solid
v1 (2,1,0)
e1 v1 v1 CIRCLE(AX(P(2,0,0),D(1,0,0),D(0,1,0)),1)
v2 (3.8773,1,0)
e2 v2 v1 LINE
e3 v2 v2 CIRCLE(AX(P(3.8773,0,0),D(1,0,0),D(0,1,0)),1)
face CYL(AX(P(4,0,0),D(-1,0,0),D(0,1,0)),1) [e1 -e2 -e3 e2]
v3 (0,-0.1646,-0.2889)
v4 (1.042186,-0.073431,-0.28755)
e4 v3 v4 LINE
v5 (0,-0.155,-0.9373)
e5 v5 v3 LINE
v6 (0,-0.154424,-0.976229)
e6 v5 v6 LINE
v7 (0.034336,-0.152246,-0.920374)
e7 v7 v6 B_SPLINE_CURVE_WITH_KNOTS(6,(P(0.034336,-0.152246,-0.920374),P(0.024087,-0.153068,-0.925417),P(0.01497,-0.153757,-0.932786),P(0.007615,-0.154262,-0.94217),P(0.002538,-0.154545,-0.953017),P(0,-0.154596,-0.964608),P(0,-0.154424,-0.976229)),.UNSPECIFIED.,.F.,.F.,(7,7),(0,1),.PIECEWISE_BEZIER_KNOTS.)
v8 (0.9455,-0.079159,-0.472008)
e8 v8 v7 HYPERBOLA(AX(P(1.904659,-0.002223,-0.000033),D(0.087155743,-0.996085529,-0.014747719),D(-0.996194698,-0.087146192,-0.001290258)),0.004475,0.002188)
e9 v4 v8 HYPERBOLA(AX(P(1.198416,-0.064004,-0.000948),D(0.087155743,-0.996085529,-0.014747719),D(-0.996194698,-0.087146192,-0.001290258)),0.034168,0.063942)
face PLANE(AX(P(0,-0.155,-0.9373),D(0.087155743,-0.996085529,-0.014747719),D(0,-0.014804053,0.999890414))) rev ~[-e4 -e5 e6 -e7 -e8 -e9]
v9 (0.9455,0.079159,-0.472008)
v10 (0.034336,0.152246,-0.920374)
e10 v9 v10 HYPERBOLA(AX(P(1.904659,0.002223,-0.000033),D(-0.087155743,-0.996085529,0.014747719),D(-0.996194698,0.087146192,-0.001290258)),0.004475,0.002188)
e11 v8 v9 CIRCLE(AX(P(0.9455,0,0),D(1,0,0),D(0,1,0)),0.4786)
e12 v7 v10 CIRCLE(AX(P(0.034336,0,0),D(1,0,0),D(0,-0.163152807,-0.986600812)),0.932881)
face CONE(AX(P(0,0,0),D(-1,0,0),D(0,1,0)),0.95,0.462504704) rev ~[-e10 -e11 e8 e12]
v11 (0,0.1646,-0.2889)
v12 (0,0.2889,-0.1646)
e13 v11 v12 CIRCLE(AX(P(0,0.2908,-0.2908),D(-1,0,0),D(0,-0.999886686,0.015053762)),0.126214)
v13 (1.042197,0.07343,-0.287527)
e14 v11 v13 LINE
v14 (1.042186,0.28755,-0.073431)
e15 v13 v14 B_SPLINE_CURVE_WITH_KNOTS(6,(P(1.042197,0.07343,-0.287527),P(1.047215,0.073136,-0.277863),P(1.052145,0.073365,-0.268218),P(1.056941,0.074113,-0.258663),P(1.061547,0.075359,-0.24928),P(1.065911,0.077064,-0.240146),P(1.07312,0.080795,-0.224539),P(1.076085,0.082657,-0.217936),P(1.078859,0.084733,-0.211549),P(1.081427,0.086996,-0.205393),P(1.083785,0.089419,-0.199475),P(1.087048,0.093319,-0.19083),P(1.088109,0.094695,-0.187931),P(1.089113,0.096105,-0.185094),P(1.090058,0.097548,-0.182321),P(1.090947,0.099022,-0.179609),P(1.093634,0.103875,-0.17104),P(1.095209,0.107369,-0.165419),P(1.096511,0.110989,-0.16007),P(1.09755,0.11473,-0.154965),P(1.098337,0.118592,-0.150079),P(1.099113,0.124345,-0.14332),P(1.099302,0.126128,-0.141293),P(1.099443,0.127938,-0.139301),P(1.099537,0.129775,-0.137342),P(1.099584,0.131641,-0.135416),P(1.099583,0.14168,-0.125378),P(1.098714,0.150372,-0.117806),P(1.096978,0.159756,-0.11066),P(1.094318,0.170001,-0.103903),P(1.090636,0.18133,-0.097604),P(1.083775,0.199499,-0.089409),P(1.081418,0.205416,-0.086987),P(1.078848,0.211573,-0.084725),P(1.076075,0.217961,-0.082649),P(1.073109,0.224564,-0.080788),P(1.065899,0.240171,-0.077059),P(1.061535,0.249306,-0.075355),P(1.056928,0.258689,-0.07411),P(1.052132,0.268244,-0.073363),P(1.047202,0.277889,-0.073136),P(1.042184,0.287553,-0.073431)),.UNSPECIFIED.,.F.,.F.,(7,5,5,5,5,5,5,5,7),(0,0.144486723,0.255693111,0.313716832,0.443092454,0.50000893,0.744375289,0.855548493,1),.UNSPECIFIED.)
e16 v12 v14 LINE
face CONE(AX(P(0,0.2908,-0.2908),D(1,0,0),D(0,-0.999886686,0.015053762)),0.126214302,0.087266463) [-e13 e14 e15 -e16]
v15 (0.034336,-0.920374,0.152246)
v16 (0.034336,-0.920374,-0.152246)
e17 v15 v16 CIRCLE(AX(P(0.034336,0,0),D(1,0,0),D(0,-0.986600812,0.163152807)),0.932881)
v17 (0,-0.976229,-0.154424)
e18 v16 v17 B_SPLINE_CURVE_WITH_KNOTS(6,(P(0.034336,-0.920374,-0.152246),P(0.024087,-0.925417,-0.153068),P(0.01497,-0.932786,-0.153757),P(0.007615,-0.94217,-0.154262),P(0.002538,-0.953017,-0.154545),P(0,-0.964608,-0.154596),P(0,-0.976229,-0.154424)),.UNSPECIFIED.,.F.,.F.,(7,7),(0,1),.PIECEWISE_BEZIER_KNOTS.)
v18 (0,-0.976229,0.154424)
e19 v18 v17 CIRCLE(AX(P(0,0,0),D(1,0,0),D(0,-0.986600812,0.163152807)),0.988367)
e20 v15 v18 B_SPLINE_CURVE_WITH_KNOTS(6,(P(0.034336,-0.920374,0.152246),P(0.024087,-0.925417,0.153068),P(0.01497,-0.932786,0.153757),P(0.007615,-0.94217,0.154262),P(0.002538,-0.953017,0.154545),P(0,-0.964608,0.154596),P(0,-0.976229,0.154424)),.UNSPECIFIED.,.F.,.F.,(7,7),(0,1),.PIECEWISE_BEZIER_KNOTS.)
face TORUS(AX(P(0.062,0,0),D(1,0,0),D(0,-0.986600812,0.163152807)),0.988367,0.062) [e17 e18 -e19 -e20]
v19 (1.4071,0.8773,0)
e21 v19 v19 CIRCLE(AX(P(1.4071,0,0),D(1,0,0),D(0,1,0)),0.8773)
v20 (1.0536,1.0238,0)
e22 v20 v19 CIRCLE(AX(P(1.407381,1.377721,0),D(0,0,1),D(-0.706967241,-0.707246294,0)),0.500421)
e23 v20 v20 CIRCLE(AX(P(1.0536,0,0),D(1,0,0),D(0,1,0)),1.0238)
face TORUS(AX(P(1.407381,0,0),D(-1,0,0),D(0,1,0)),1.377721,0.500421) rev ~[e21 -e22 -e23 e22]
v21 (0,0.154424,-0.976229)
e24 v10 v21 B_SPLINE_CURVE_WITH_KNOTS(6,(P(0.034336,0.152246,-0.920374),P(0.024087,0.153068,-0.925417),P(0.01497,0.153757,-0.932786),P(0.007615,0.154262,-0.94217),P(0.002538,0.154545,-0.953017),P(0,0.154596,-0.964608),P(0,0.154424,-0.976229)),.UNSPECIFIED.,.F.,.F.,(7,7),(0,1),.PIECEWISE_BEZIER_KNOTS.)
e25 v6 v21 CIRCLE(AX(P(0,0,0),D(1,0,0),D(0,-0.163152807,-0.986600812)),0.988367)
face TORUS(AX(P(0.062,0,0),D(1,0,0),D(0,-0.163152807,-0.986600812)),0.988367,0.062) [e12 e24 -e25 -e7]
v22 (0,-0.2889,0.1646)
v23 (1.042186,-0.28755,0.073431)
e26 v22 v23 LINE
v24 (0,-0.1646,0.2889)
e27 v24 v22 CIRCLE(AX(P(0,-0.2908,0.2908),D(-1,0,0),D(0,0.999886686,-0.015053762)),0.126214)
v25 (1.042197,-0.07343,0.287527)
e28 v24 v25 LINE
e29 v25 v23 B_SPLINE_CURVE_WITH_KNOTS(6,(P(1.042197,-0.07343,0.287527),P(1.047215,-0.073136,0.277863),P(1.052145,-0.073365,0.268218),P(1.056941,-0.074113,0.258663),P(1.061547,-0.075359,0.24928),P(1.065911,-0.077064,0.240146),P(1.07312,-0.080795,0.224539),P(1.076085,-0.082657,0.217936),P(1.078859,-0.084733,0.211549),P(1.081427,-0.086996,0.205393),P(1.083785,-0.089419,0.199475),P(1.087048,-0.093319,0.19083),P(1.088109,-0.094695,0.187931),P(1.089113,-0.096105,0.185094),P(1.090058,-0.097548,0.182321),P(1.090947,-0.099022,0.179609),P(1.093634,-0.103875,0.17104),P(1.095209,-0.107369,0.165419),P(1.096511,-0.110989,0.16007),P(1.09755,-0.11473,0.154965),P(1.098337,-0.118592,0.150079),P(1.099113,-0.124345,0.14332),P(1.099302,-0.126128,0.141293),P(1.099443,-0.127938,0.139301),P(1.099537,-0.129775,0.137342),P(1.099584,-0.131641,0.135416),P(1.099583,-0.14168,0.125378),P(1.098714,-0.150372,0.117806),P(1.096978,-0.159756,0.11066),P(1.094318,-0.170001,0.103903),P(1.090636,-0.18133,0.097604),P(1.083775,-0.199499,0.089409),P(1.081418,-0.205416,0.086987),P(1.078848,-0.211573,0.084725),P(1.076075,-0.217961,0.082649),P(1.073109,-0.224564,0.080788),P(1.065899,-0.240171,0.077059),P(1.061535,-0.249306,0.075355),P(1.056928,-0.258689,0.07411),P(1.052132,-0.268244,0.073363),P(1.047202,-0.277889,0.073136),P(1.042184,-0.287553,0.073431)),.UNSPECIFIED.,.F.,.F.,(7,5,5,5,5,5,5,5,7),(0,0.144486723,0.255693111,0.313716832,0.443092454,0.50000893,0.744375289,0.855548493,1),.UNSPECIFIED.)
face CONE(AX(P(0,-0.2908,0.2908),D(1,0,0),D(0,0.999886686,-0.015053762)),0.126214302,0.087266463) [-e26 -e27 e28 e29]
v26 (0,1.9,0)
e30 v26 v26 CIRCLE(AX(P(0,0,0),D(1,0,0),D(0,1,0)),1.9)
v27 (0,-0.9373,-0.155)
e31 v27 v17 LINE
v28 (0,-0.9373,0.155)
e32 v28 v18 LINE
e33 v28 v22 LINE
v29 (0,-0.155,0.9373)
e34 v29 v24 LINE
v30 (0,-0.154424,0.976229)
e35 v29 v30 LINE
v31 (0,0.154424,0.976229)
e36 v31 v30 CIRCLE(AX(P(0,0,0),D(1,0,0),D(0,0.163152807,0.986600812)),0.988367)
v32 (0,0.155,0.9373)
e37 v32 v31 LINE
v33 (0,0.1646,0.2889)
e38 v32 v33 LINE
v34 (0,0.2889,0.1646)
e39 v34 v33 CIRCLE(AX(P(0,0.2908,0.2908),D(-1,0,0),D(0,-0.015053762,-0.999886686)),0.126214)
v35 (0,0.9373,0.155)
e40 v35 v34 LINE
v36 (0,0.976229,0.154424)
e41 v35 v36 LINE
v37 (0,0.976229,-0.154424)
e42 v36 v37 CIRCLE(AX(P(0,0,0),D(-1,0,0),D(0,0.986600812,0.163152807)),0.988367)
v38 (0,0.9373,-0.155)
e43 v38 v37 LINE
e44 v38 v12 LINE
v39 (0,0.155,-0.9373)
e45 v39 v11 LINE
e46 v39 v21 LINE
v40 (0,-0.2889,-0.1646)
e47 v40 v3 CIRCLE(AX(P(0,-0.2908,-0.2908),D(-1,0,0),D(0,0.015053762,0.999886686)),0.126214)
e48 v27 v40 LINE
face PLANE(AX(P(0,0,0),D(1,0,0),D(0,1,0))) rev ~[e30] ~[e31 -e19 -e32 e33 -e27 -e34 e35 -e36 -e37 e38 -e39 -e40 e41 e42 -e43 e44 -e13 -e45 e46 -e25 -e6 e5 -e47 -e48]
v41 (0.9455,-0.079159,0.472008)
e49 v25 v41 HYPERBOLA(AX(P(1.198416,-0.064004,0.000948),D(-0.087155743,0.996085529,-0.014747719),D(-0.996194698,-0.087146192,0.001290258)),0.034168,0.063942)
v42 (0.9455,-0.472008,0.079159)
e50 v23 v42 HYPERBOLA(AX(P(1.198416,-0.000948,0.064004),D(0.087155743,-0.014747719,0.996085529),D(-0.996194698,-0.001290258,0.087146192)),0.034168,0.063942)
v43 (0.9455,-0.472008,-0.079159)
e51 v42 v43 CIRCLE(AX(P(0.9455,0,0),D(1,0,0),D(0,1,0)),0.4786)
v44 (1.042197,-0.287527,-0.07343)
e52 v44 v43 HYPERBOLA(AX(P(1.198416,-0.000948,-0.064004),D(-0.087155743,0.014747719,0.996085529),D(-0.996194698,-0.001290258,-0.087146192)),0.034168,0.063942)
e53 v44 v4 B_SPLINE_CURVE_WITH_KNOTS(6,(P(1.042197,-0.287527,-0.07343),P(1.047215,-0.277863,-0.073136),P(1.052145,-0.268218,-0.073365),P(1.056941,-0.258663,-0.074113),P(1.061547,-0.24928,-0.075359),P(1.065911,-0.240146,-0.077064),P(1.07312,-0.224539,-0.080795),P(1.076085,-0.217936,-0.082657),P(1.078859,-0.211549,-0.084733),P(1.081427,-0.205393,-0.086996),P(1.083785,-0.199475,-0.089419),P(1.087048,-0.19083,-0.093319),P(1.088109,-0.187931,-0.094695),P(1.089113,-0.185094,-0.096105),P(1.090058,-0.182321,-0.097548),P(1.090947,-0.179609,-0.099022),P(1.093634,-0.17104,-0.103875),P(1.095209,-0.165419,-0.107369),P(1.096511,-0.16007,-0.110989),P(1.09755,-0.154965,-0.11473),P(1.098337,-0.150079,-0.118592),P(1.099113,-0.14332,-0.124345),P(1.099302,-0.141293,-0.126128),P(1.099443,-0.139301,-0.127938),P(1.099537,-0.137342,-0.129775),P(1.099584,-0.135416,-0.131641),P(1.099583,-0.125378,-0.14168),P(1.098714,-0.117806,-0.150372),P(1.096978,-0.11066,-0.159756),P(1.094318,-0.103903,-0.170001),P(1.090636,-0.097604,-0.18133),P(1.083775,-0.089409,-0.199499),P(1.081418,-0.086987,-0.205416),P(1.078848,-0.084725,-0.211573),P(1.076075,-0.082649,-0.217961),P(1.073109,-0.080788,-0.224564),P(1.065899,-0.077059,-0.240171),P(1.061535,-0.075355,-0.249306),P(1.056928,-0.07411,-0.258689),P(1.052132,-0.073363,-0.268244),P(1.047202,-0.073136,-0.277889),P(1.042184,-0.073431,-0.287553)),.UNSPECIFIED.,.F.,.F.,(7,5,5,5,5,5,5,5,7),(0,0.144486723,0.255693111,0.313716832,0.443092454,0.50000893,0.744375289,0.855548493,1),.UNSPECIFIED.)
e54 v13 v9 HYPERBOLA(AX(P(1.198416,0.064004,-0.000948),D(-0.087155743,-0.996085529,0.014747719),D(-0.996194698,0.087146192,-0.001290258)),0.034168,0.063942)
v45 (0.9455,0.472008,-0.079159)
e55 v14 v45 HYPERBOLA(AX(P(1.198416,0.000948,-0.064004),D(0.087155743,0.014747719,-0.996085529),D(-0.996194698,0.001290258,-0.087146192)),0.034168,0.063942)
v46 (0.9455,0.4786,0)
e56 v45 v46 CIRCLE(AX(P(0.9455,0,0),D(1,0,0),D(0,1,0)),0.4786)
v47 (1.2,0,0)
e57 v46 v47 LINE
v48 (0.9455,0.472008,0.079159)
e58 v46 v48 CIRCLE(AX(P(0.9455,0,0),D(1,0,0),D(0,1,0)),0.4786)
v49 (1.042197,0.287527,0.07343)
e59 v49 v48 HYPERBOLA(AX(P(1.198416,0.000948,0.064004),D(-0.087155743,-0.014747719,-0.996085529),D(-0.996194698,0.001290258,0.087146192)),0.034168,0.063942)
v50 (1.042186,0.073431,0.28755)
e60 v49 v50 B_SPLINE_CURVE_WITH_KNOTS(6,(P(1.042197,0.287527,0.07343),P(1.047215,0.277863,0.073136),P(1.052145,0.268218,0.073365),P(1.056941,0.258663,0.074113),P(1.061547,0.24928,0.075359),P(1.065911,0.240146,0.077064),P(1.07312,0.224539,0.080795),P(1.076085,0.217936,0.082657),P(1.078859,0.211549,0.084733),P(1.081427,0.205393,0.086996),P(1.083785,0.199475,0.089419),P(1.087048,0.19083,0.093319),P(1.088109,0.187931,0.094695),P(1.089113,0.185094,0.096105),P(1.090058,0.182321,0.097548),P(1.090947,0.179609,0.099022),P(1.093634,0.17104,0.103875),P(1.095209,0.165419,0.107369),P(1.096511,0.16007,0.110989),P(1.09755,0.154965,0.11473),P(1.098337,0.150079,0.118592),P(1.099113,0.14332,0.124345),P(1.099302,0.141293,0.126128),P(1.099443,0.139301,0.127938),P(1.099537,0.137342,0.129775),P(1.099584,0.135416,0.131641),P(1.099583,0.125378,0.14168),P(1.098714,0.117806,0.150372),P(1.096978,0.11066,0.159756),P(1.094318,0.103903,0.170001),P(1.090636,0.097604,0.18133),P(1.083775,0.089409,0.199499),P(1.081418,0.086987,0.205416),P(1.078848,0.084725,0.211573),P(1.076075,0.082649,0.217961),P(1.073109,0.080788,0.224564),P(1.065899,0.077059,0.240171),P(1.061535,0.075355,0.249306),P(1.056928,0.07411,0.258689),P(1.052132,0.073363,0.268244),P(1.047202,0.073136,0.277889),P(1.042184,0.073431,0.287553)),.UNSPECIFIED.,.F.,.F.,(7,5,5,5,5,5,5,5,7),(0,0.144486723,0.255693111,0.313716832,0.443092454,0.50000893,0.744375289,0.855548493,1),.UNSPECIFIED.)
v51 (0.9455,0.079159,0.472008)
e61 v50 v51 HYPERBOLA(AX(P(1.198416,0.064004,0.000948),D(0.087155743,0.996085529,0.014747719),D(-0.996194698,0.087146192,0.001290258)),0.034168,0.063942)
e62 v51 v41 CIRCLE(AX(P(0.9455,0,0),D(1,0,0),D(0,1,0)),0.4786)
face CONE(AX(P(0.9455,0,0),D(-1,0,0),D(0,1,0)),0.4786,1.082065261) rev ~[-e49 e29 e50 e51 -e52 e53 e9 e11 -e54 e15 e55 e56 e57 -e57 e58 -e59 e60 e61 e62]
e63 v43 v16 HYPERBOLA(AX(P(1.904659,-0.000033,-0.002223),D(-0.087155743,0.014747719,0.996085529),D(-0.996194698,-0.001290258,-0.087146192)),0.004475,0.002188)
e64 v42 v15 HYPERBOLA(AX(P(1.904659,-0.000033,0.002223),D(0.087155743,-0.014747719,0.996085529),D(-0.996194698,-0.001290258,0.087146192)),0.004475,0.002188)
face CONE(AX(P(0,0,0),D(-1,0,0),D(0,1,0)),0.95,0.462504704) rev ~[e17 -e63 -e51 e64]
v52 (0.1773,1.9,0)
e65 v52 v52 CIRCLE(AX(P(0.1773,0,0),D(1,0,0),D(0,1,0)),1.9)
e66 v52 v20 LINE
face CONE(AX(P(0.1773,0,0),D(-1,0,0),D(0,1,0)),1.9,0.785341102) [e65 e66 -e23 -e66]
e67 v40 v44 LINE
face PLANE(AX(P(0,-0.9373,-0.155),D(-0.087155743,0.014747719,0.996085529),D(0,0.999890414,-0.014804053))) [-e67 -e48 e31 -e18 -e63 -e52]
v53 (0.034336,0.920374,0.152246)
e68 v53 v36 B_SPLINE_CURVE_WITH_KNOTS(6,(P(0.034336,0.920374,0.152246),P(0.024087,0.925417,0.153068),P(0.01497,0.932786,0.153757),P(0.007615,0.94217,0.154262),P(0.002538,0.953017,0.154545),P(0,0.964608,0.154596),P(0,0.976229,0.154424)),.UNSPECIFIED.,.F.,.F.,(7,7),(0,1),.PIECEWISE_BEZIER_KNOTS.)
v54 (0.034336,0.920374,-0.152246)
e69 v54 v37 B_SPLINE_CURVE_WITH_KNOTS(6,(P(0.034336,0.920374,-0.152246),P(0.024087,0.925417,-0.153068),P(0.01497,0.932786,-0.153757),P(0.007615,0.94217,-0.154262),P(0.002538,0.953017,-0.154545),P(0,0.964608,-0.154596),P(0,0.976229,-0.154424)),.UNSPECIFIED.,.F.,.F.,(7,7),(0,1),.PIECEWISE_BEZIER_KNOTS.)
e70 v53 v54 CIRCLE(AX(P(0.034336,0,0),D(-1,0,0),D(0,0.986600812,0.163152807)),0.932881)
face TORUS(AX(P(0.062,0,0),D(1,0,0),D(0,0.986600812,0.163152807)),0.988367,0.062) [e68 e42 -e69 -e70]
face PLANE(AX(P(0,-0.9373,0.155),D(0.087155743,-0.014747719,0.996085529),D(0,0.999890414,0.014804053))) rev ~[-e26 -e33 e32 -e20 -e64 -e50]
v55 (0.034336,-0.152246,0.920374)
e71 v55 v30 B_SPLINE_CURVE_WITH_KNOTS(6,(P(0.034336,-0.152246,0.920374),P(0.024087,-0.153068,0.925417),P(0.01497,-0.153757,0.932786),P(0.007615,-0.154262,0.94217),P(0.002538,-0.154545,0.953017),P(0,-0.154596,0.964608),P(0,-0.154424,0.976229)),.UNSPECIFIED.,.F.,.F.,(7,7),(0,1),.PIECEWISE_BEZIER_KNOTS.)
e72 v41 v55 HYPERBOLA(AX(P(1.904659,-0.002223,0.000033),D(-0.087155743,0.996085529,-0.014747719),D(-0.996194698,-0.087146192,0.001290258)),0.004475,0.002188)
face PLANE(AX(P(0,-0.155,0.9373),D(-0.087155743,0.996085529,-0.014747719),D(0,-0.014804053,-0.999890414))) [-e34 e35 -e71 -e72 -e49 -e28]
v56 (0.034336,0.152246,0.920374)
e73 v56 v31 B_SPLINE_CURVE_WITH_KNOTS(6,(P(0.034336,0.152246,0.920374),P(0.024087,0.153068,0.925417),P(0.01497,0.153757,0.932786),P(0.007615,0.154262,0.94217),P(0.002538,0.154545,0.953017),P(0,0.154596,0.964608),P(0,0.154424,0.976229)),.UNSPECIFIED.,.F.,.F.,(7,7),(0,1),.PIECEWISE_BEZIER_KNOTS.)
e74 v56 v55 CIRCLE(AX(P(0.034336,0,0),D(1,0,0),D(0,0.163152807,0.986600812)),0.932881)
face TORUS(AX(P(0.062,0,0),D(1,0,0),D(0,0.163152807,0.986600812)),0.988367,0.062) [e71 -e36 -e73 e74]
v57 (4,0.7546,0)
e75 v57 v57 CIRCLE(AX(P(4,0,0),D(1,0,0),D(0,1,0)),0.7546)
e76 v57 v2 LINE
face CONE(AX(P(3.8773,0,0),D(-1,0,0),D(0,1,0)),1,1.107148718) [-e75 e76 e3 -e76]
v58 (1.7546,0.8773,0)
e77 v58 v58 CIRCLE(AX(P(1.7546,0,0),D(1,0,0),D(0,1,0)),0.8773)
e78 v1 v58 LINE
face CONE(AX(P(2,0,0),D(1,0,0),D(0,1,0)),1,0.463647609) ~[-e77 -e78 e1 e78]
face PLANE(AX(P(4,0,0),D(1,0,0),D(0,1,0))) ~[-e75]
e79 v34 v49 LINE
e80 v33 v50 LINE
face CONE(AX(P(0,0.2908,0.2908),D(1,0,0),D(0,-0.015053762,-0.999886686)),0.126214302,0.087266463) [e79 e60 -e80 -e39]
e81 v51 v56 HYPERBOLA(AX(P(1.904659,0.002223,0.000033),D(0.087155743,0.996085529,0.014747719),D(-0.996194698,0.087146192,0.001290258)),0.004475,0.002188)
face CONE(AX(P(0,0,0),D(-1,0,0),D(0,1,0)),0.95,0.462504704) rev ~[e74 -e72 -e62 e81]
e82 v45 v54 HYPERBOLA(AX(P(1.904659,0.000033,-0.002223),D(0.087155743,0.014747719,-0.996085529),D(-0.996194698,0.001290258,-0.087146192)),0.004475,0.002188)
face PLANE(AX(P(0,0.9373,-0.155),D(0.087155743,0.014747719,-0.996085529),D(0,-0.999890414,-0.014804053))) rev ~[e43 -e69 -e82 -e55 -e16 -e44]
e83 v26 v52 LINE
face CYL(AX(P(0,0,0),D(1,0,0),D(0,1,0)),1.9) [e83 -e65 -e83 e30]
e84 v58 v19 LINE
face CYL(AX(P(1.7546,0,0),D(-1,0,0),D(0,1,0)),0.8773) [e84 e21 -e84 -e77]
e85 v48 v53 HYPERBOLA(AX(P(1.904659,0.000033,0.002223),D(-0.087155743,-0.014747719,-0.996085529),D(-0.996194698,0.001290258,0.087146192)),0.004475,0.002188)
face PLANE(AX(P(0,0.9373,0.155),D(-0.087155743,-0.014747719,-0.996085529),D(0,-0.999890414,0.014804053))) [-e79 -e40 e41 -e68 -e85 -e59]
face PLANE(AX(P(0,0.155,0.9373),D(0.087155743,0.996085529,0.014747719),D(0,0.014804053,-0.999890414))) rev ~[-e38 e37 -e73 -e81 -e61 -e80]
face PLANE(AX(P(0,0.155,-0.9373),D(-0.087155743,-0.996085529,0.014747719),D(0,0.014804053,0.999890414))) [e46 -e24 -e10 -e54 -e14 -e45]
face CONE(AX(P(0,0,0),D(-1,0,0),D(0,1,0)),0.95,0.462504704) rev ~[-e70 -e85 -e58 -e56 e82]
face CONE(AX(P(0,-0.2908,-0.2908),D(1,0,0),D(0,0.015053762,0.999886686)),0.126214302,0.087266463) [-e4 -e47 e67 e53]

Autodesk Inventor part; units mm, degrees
ref_plane "YZ Plane" through (0, 0, 0) normal (1, 0, 0) x (0, 1, 0)
ref_plane "XZ Plane" through (0, 0, 0) normal (0, 1, 0) x (-1, 0, 0)
sketch "Sketch1" plane through (0, 0, 0) normal (0, 0, 1) x (1, 0, 0)
  line L0 (1.2, 0) -> (4, 0)
  line L1 (4, 0) -> (4, 1)
  line L2 (4, 1) -> (2, 1)
  line L3 (2, 1) -> (1.7546, 0.8773)
  line L4 (1.7546, 0.8773) -> (1.4071, 0.8773)
  line L5 (0, 1.9) -> (0, 0.95)
  line L6 (0, 0.95) -> (0.9455, 0.4786)
  line L7 (0.9455, 0.4786) -> (1.2, 0)
  line L8 (-0.8, 0) -> (4.8, 0) projected
  line L9 (0, -0.38) -> (0, 2.28) projected
  line L10 (0, 1.9) -> (0.1773, 1.9)
  line L11 (0.1773, 1.9) -> (1.0536, 1.0238)
  line L12 (2, 1) -> (1.0773, 1) construction
  arc A0 (1.0536, 1.0238) -> (1.4071, 0.8773) centre (1.4071, 1.3773) ccw
  point P0 (1.2, 0.8773)
  dimension "d1" = 2
  dimension "d2" = 2
  dimension "d3" = 1.7546
  dimension "d4" = 1.9
  dimension "d5" = 26.5
  dimension "d6" = 62
  dimension "d7" = 1.2
  dimension "d8" = 0.2454
  dimension "d12" = 3.8
  dimension "d13" = 45
  dimension "d15" = 4
  dimension "d24" = 1.2
  dimension "d93" = 0.5
revolve "Body" add sketch "Sketch1" angle 360 about axis through (1.2, 0, 0) along (1, 0, 0) contours L7 L6 L5 L10 L11 A0 L4 L3 L2 L1 L0
sketch "Sketch2" plane through (0, 0, 0) normal (-1, 0, 0) x (0, 0, 1)
  line L0 (0, 0.95) -> (0, 0) construction
  line L1 (0, 0) -> (0.95, 0) construction
  arc A0 (0.285, 0) -> (0, 0.285) centre (0, 0) ccw construction
  arc A1 (0.3325, 0) -> (0, 0.3325) centre (0, 0) ccw construction
  arc A2 (0.9373, 0.155) -> (0.155, 0.9373) centre (0, 0) ccw
  line L2 (0, 0) -> (0.6718, 0.6718) construction
  line L3 (0.155, 0.9373) -> (0.1646, 0.2889)
  line L4 (0.9373, 0.155) -> (0.2889, 0.1646)
  arc A3 (0.155, 0.9373) -> (0, 0.95) centre (0, 0) ccw
  arc A4 (0.95, 0) -> (0.9373, 0.155) centre (0, 0) ccw
  line L5 (0, -2.66) -> (0, 2.66) projected
  line L6 (-2.66, 0) -> (2.66, 0) projected
  arc A5 (0.155, -0.9373) -> (0.9373, -0.155) centre (0, 0) ccw
  line L7 (0.155, -0.9373) -> (0.1646, -0.2889)
  line L8 (0.9373, -0.155) -> (0.2889, -0.1646)
  arc A6 (0, -0.95) -> (0.155, -0.9373) centre (0, 0) ccw
  arc A7 (0.9373, -0.155) -> (0.95, 0) centre (0, 0) ccw
  arc A8 (-0.155, 0.9373) -> (-0.9373, 0.155) centre (0, 0) ccw
  line L9 (-0.155, 0.9373) -> (-0.1646, 0.2889)
  line L10 (-0.9373, 0.155) -> (-0.2889, 0.1646)
  arc A9 (0, 0.95) -> (-0.155, 0.9373) centre (0, 0) ccw
  arc A10 (-0.9373, 0.155) -> (-0.95, 0) centre (0, 0) ccw
  arc A11 (-0.155, -0.9373) -> (0, -0.95) centre (0, 0) ccw
  arc A12 (-0.9373, -0.155) -> (-0.155, -0.9373) centre (0, 0) ccw
  arc A13 (-0.95, 0) -> (-0.9373, -0.155) centre (0, 0) ccw
  line L11 (-0.9373, -0.155) -> (-0.2889, -0.1646)
  line L12 (-0.155, -0.9373) -> (-0.1646, -0.2889)
  arc A14 (0.1646, 0.2889) -> (0.2889, 0.1646) centre (0.2908, 0.2908) ccw
  arc A15 (0.2889, -0.1646) -> (0.1646, -0.2889) centre (0.2908, -0.2908) ccw
  arc A16 (-0.2889, 0.1646) -> (-0.1646, 0.2889) centre (-0.2908, 0.2908) ccw
  arc A17 (-0.1646, -0.2889) -> (-0.2889, -0.1646) centre (-0.2908, -0.2908) ccw
  point P0 (0.6718, -0.6718)
  point P1 (-0.6718, 0.6718)
  point P2 (-0.6718, -0.6718)
  dimension "d17" = 0.57
  dimension "d18" = 0.665
  dimension "d19" = 1.9
  dimension "d20" = 45
  dimension "d21" = 0.155
extrude "Slot" add sketch "Sketch2" against normal up to next draft 5 contours L4 A14 L3 A2 | A5 L7 A15 L8 | L9 A16 L10 A8 | A12 L11 A17 L12
fillet "Fillet1" radius 0.062 4 edges at (0, 0.95, 0) (0, 0, -0.95) (0, -0.95, 0) (0, 0, 0.95)
thread "Thread" size "M2x0.4" class "6g" standard "ISO Metric profile" length 2
chamfer "Chamfer1" distance 0.2454 distance2 0.1227 1 edges at (4, -1, 0) measured on face at (4, 0.479, -0.3842)
ref_plane "Work Plane2" through (3.35, 0, 0) normal (0, 0, -1) x (1, 0, 0)
equation "\"d1\" = GEL"
equation "\"d2\" = GD"
equation "\"d3\" = BDM"
equation "\"d4\" = SDM"
equation "\"d7\" = INTI"
equation "\"d8\" = GAL"
equation "\"d12\" = KOD"
equation "\"d13\" = 0.5 * SEWI"
equation "\"d15\" = NLG"
equation "\"d24\" = KOH"
equation "\"d93\" = R"
equation "\"d17\" = 0.3 * SDM"
equation "\"d18\" = 0.35 * SDM"
equation "\"d19\" = SDM"
equation "\"d21\" = 0.5 * SBR"
equation "\"d23\" = 0.2 * SBR"
equation "\"d10\" = GEL"
equation "\"d25\" = -0.5 * SPD + 0.5 * GD"
equation "\"d26\" = 0.5 * GAL"
equation "\"NLG\" = 4"
equation "\"GEL\" = 2"
equation "\"GAL\" = 0.61345 * PTC"
equation "\"SPD\" = NND - 1.2269 * PTC"
equation "\"KOD\" = 3.8"
equation "\"KOH\" = 1.2"
equation "\"SBR\" = 0.31"
equation "\"INTI\" = 1.2"
equation "\"SDM\" = 1.9"
equation "\"GD\" = NND"
equation "\"BDM\" = NND - GAL"
equation "\"SEWI\" = 90deg"
equation "\"d9\" = SDM"
equation "\"R\" = 0.5"
equation "\"GUL\" = 0.61345 * PTC"
equation "\"TOA\" = 30deg"
equation "\"EPV\" = 2.2"
equation "\"THREADDIA\" = 2"
equation "\"PTC\" = 0.4"
equation "\"NND\" = 2"
equation "\"GD1\" = THREADDIA - 1.2269 * PTC"
properties part number "ISO 7046-1  - M2 x 4 - 4.8 - H" material "Steel"
